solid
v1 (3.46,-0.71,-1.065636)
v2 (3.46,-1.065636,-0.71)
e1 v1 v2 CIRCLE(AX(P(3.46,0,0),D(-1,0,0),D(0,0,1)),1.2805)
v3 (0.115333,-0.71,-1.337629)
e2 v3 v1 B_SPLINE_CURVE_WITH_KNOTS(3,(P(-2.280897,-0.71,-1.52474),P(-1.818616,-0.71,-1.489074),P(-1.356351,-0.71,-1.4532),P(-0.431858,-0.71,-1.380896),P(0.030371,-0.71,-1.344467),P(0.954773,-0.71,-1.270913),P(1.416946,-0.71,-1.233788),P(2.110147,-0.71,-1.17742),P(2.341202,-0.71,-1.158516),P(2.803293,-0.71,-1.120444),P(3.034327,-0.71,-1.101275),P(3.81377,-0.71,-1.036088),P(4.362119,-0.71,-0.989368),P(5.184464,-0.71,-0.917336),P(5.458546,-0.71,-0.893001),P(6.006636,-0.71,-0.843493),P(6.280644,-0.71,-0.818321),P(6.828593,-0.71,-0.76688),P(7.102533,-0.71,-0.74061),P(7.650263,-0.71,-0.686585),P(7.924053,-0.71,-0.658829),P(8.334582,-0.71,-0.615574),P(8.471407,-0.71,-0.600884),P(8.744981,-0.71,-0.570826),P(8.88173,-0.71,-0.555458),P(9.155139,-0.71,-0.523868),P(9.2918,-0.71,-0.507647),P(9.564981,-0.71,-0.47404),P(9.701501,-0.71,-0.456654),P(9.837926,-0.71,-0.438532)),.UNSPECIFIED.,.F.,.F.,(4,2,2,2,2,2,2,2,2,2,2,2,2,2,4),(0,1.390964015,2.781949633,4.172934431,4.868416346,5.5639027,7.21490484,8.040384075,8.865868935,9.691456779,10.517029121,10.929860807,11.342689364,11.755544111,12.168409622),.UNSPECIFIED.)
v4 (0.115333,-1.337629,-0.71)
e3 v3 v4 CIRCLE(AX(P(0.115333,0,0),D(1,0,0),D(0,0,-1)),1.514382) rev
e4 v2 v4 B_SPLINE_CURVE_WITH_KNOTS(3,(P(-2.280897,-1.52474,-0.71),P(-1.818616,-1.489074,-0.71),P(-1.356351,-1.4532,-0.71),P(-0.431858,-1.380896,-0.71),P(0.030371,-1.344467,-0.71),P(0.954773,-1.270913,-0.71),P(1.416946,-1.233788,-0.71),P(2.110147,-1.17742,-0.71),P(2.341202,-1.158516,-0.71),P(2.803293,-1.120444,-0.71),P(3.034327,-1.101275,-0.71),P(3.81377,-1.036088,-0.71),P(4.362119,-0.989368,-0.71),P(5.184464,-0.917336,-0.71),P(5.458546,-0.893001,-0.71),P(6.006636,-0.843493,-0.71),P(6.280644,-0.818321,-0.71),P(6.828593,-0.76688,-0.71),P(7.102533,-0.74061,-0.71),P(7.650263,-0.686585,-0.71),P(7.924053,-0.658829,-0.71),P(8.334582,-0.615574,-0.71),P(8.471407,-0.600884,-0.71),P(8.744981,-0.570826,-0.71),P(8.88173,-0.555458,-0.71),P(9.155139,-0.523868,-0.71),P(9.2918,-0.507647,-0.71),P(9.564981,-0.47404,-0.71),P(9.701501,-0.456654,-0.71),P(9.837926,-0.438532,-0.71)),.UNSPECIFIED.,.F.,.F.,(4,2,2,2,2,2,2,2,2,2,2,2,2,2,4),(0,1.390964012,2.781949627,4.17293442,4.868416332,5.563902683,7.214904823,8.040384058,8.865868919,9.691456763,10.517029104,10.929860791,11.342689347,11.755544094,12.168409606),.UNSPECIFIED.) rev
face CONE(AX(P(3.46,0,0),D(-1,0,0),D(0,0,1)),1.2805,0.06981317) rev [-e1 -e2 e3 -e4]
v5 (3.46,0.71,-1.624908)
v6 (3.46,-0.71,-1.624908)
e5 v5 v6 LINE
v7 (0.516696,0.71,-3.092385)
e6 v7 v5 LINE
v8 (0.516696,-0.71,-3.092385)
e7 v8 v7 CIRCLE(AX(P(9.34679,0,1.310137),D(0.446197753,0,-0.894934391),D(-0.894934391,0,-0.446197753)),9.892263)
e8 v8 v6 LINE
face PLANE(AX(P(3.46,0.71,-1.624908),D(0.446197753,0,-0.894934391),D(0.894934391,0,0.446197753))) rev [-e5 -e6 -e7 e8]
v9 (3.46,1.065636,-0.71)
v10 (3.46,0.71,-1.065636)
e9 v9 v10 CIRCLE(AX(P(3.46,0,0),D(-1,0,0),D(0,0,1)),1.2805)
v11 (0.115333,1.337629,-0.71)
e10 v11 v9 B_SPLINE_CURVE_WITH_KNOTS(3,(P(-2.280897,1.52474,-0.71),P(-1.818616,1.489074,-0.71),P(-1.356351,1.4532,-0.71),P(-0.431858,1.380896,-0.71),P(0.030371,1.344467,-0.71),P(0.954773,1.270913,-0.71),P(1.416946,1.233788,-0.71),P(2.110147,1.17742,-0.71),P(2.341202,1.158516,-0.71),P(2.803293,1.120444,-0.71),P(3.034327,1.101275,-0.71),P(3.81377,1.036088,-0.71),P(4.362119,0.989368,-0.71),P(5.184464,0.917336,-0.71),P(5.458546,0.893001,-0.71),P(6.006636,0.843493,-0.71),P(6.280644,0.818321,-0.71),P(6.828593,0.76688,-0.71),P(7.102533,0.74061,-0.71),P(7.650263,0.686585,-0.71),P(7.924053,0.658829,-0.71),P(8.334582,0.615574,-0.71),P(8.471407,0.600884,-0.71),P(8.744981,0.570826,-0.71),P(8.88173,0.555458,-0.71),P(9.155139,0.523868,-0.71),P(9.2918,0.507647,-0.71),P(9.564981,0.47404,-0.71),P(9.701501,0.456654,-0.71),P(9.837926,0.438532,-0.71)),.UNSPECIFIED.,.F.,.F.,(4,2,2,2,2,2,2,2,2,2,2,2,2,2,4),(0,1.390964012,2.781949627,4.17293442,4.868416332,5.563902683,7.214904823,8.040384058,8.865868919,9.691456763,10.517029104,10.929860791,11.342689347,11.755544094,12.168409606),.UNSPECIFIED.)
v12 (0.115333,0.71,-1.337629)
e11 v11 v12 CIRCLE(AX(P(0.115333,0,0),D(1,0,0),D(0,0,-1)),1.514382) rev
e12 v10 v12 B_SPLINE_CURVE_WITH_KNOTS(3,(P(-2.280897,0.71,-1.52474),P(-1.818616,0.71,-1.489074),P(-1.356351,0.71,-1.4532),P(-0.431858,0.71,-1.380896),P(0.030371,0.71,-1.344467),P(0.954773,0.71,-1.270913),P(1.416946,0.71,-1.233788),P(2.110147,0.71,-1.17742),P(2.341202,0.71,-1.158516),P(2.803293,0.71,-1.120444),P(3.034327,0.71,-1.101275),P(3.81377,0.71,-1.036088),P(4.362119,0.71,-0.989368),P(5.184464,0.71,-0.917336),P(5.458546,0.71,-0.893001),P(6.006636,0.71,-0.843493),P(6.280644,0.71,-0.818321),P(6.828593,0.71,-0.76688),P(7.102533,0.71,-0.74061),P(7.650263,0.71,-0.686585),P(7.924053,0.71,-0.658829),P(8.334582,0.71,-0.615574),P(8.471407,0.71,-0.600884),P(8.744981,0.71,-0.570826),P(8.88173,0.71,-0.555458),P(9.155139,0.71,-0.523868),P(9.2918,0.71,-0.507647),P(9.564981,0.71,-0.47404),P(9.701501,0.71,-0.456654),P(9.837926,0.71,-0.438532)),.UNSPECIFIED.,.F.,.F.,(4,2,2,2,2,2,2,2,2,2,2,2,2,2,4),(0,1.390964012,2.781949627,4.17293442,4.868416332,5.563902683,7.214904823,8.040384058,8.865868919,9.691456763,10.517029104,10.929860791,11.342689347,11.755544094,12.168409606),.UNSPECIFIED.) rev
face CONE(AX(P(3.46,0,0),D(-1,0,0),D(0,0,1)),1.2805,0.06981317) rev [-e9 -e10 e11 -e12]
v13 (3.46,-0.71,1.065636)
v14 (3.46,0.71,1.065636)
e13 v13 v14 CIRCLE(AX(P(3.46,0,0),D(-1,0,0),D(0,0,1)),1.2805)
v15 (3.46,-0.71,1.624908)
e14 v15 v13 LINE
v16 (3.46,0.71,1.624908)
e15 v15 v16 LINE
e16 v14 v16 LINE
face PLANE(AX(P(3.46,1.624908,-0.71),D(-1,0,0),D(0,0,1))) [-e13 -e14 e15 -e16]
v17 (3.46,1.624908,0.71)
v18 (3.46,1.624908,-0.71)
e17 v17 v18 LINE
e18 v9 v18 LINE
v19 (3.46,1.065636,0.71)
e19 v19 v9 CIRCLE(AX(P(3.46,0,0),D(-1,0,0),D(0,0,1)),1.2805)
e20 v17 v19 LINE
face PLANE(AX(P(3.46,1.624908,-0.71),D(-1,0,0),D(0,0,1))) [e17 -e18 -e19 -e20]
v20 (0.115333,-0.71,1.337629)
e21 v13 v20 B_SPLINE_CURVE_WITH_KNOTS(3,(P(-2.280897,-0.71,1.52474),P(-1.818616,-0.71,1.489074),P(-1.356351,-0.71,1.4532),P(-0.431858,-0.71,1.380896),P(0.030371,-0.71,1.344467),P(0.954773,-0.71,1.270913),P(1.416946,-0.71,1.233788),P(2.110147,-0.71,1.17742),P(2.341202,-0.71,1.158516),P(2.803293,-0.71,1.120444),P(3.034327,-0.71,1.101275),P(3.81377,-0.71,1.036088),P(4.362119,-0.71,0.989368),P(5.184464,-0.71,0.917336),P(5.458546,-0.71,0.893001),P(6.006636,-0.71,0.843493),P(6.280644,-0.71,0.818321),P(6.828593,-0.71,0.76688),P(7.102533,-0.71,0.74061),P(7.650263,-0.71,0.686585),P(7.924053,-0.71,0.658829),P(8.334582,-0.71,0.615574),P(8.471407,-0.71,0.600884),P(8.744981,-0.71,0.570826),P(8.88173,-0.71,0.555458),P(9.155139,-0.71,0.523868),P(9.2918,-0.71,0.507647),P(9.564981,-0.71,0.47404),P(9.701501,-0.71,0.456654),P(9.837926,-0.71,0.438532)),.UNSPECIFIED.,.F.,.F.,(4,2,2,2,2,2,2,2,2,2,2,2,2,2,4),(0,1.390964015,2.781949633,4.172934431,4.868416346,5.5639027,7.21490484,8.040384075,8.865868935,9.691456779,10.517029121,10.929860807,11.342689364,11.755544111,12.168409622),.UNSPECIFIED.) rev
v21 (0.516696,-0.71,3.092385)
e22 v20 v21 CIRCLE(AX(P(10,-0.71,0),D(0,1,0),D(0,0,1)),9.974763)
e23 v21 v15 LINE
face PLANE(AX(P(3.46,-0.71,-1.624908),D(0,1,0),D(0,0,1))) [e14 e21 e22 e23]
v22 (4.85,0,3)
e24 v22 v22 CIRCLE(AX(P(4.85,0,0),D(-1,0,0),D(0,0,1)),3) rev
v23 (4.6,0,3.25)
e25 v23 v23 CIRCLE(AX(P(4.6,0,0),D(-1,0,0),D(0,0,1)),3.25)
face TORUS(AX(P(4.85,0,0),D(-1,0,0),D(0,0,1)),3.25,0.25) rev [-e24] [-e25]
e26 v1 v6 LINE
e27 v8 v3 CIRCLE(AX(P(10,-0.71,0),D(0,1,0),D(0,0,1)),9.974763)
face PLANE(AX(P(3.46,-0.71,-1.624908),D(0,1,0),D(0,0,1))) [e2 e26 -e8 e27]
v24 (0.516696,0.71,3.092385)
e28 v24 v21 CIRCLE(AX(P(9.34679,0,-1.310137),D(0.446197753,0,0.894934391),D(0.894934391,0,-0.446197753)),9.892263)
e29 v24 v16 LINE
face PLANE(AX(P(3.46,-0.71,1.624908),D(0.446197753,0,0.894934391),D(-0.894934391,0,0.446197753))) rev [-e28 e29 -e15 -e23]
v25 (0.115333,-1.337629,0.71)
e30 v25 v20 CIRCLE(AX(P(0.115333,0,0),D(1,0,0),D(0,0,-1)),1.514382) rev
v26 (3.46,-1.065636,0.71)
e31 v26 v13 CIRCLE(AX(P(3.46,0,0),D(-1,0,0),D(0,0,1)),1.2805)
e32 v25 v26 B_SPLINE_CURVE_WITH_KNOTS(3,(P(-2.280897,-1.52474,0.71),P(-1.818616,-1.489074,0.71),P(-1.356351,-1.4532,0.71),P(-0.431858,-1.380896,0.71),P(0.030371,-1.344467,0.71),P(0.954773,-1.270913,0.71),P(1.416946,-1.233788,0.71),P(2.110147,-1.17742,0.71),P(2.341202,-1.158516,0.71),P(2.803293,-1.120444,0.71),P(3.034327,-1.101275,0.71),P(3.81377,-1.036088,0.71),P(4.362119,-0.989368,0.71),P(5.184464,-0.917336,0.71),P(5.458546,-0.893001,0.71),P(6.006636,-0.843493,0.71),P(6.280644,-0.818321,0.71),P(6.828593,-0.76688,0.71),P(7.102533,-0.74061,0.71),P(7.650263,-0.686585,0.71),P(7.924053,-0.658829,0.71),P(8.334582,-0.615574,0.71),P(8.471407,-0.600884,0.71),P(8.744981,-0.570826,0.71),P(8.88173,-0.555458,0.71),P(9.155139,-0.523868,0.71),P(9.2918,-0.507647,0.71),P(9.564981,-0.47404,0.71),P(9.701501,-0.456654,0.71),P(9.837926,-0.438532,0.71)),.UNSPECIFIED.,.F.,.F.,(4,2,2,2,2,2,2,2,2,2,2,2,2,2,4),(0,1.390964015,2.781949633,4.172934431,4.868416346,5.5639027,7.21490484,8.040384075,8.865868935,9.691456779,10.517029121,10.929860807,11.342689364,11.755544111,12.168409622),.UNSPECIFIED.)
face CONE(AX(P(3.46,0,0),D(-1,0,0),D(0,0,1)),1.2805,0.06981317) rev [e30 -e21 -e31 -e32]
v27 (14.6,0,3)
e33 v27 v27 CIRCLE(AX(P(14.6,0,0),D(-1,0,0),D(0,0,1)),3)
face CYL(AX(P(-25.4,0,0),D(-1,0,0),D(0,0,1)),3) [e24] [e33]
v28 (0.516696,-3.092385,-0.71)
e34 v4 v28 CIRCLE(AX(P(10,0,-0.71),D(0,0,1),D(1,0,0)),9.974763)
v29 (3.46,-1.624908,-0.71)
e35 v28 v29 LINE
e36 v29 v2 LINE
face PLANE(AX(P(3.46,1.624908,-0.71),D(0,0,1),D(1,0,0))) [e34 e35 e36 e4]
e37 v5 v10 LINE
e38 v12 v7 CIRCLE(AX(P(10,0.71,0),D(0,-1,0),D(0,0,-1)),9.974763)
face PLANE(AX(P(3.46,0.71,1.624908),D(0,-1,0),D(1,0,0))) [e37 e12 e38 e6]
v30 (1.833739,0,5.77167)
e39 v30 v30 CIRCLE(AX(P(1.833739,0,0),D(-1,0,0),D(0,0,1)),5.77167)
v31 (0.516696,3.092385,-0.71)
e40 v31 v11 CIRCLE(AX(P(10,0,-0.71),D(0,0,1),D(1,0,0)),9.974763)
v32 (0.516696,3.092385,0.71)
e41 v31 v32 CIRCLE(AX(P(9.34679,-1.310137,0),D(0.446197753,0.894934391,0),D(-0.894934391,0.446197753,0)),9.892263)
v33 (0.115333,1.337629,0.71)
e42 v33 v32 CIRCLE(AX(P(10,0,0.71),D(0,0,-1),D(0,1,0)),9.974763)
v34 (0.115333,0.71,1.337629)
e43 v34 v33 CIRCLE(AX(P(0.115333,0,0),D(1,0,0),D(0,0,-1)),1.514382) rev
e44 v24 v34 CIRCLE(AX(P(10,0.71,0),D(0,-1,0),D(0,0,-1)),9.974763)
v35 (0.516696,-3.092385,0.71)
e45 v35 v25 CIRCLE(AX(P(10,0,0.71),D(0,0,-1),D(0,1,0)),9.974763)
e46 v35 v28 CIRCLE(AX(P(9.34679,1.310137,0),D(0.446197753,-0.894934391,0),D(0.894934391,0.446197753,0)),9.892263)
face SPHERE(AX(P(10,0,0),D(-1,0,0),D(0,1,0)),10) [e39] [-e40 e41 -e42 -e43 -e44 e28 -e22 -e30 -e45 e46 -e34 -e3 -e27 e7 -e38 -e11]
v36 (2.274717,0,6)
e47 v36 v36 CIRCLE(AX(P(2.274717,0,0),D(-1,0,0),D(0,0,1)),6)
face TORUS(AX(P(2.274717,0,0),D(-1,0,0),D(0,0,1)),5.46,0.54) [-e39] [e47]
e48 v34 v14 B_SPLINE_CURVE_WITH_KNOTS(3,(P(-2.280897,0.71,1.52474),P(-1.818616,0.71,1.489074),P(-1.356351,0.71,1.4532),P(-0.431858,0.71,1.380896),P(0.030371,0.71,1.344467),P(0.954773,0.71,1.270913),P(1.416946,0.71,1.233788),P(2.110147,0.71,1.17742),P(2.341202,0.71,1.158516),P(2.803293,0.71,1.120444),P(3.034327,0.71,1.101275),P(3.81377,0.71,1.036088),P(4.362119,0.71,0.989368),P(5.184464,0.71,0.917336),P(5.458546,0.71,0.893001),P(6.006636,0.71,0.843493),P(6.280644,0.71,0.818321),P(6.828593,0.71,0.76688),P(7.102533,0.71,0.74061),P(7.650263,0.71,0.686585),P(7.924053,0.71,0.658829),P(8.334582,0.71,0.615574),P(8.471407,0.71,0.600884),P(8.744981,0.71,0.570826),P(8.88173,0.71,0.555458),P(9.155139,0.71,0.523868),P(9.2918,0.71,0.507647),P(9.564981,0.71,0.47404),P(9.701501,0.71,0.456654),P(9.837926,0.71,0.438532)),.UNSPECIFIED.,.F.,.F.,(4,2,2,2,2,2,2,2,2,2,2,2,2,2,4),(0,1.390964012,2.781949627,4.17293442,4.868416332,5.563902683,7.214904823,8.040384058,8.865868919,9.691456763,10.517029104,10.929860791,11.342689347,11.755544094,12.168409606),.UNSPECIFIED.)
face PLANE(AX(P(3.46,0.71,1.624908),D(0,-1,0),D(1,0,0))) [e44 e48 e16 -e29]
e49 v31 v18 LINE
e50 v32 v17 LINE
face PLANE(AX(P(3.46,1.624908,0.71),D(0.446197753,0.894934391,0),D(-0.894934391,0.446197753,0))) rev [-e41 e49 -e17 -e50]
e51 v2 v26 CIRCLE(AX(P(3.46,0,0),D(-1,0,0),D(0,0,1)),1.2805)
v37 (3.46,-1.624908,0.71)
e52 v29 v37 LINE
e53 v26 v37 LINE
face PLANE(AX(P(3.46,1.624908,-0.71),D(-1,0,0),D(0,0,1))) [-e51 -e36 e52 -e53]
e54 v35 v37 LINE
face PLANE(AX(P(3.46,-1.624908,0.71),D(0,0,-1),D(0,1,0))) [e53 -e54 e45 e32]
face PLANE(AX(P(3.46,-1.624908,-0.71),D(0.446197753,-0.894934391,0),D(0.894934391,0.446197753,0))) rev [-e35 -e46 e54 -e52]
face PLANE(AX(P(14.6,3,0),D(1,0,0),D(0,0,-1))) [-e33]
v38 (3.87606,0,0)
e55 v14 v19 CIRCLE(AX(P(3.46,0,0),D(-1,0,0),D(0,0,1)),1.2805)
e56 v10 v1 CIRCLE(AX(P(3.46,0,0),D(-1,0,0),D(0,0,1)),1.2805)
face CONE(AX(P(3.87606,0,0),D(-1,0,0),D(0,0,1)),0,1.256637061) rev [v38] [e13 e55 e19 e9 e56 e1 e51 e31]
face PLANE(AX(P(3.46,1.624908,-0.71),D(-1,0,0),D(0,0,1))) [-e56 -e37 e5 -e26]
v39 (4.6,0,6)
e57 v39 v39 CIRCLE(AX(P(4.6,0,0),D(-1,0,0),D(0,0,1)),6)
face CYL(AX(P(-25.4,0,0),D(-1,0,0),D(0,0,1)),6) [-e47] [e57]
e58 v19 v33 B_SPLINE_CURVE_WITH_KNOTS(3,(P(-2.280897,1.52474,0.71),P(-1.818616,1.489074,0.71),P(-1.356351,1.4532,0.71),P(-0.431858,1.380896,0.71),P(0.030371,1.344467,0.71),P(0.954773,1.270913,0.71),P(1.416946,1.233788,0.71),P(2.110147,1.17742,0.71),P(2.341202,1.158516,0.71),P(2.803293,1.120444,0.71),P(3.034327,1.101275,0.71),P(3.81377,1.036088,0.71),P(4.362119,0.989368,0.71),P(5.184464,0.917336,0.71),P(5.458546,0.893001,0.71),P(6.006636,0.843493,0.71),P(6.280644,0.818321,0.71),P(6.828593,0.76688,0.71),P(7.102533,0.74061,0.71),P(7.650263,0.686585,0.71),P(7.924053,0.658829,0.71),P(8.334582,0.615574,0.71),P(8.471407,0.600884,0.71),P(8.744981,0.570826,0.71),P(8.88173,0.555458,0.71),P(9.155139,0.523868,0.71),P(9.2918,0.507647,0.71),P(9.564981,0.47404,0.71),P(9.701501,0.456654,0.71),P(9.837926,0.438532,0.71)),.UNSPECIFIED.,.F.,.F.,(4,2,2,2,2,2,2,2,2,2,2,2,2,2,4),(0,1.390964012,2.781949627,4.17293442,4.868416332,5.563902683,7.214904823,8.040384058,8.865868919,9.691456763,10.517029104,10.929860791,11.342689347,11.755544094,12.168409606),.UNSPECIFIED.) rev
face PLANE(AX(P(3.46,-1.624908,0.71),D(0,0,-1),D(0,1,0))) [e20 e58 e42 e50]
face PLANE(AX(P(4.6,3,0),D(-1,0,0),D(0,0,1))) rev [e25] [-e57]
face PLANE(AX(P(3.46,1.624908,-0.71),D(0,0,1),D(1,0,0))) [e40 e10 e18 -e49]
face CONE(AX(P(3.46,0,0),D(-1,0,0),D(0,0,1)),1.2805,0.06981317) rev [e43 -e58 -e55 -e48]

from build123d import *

# Parameters (mm, degrees)
RECPAT_COUNT = 2
RECPAT_ANGLE = 90


with BuildPart() as part:
    # Fillet1: read off the stored shape, not the designer's step
    # Fillet1 outline → Fillet1 (revolve)
    with BuildSketch(Plane.YX):
        with BuildLine():
            Line((3, 4.85), (3, 14.6))
            Line((3, 14.6), (0, 14.6))
            Line((0, 14.6), (0, 0))
            ThreePointArc((0, 0), (3.027985079, 0.469454036), (5.771670194, 1.833738728))
            ThreePointArc((5.771670194, 1.833738728), (5.939532013, 2.026424569), (6, 2.274716834))
            Line((6, 2.274716834), (6, 4.6))
            Line((6, 4.6), (3.25, 4.6))
            ThreePointArc((3.25, 4.6), (3.073223305, 4.673223305), (3, 4.85))
        make_face()
    revolve(axis=Axis((0, 0, 0), (1, 0, 0)))

    # Sketch3 → Recess section 0
    with BuildSketch(Plane(origin=(0, 0, 0), x_dir=(0, 0, -1), z_dir=(1, 0, 0))):
        with BuildLine():
            Line((0.71, -3.35), (-0.71, -3.35))
            Line((-0.71, -3.35), (-0.71, 3.35))
            Line((-0.71, 3.35), (0.71, 3.35))
            Line((0.71, 3.35), (0.71, -3.35))
        make_face()
    # Sketch4 → Recess section 1
    with BuildSketch(Plane(origin=(3.46, 0, 0), x_dir=(0, 0, -1), z_dir=(1, 0, 0))):
        with BuildLine():
            Line((0.71, -1.624907925), (-0.71, -1.624907925))
            Line((-0.71, -1.624907925), (-0.71, 1.624907925))
            Line((-0.71, 1.624907925), (0.71, 1.624907925))
            Line((0.71, 1.624907925), (0.71, -1.624907925))
        make_face()
    recess = loft(mode=Mode.SUBTRACT)

    # RecPat: Recess ×2 about axis
    recpat_axis = Axis((0, 0, 0), (1, 0, 0))
    for i in range(1, RECPAT_COUNT):
        add(recess.rotate(recpat_axis, i * RECPAT_ANGLE / (RECPAT_COUNT - 1)), mode=Mode.SUBTRACT)

    # RecCorSke → RecessCore (revolve, cut)
    with BuildSketch(Plane.XY, mode=Mode.PRIVATE) as recesscore_sk:
        Polygon((0, 0), (0, 1.522446769), (3.46, 1.2805), (3.876059671, 0), align=None)
    revolve(recesscore_sk.sketch.rotate(Axis((-3.175, 0, 0), (1, 0, 0)), 90), axis=Axis((-3.175, 0, 0), (1, 0, 0)), mode=Mode.SUBTRACT)


solid = part.part
